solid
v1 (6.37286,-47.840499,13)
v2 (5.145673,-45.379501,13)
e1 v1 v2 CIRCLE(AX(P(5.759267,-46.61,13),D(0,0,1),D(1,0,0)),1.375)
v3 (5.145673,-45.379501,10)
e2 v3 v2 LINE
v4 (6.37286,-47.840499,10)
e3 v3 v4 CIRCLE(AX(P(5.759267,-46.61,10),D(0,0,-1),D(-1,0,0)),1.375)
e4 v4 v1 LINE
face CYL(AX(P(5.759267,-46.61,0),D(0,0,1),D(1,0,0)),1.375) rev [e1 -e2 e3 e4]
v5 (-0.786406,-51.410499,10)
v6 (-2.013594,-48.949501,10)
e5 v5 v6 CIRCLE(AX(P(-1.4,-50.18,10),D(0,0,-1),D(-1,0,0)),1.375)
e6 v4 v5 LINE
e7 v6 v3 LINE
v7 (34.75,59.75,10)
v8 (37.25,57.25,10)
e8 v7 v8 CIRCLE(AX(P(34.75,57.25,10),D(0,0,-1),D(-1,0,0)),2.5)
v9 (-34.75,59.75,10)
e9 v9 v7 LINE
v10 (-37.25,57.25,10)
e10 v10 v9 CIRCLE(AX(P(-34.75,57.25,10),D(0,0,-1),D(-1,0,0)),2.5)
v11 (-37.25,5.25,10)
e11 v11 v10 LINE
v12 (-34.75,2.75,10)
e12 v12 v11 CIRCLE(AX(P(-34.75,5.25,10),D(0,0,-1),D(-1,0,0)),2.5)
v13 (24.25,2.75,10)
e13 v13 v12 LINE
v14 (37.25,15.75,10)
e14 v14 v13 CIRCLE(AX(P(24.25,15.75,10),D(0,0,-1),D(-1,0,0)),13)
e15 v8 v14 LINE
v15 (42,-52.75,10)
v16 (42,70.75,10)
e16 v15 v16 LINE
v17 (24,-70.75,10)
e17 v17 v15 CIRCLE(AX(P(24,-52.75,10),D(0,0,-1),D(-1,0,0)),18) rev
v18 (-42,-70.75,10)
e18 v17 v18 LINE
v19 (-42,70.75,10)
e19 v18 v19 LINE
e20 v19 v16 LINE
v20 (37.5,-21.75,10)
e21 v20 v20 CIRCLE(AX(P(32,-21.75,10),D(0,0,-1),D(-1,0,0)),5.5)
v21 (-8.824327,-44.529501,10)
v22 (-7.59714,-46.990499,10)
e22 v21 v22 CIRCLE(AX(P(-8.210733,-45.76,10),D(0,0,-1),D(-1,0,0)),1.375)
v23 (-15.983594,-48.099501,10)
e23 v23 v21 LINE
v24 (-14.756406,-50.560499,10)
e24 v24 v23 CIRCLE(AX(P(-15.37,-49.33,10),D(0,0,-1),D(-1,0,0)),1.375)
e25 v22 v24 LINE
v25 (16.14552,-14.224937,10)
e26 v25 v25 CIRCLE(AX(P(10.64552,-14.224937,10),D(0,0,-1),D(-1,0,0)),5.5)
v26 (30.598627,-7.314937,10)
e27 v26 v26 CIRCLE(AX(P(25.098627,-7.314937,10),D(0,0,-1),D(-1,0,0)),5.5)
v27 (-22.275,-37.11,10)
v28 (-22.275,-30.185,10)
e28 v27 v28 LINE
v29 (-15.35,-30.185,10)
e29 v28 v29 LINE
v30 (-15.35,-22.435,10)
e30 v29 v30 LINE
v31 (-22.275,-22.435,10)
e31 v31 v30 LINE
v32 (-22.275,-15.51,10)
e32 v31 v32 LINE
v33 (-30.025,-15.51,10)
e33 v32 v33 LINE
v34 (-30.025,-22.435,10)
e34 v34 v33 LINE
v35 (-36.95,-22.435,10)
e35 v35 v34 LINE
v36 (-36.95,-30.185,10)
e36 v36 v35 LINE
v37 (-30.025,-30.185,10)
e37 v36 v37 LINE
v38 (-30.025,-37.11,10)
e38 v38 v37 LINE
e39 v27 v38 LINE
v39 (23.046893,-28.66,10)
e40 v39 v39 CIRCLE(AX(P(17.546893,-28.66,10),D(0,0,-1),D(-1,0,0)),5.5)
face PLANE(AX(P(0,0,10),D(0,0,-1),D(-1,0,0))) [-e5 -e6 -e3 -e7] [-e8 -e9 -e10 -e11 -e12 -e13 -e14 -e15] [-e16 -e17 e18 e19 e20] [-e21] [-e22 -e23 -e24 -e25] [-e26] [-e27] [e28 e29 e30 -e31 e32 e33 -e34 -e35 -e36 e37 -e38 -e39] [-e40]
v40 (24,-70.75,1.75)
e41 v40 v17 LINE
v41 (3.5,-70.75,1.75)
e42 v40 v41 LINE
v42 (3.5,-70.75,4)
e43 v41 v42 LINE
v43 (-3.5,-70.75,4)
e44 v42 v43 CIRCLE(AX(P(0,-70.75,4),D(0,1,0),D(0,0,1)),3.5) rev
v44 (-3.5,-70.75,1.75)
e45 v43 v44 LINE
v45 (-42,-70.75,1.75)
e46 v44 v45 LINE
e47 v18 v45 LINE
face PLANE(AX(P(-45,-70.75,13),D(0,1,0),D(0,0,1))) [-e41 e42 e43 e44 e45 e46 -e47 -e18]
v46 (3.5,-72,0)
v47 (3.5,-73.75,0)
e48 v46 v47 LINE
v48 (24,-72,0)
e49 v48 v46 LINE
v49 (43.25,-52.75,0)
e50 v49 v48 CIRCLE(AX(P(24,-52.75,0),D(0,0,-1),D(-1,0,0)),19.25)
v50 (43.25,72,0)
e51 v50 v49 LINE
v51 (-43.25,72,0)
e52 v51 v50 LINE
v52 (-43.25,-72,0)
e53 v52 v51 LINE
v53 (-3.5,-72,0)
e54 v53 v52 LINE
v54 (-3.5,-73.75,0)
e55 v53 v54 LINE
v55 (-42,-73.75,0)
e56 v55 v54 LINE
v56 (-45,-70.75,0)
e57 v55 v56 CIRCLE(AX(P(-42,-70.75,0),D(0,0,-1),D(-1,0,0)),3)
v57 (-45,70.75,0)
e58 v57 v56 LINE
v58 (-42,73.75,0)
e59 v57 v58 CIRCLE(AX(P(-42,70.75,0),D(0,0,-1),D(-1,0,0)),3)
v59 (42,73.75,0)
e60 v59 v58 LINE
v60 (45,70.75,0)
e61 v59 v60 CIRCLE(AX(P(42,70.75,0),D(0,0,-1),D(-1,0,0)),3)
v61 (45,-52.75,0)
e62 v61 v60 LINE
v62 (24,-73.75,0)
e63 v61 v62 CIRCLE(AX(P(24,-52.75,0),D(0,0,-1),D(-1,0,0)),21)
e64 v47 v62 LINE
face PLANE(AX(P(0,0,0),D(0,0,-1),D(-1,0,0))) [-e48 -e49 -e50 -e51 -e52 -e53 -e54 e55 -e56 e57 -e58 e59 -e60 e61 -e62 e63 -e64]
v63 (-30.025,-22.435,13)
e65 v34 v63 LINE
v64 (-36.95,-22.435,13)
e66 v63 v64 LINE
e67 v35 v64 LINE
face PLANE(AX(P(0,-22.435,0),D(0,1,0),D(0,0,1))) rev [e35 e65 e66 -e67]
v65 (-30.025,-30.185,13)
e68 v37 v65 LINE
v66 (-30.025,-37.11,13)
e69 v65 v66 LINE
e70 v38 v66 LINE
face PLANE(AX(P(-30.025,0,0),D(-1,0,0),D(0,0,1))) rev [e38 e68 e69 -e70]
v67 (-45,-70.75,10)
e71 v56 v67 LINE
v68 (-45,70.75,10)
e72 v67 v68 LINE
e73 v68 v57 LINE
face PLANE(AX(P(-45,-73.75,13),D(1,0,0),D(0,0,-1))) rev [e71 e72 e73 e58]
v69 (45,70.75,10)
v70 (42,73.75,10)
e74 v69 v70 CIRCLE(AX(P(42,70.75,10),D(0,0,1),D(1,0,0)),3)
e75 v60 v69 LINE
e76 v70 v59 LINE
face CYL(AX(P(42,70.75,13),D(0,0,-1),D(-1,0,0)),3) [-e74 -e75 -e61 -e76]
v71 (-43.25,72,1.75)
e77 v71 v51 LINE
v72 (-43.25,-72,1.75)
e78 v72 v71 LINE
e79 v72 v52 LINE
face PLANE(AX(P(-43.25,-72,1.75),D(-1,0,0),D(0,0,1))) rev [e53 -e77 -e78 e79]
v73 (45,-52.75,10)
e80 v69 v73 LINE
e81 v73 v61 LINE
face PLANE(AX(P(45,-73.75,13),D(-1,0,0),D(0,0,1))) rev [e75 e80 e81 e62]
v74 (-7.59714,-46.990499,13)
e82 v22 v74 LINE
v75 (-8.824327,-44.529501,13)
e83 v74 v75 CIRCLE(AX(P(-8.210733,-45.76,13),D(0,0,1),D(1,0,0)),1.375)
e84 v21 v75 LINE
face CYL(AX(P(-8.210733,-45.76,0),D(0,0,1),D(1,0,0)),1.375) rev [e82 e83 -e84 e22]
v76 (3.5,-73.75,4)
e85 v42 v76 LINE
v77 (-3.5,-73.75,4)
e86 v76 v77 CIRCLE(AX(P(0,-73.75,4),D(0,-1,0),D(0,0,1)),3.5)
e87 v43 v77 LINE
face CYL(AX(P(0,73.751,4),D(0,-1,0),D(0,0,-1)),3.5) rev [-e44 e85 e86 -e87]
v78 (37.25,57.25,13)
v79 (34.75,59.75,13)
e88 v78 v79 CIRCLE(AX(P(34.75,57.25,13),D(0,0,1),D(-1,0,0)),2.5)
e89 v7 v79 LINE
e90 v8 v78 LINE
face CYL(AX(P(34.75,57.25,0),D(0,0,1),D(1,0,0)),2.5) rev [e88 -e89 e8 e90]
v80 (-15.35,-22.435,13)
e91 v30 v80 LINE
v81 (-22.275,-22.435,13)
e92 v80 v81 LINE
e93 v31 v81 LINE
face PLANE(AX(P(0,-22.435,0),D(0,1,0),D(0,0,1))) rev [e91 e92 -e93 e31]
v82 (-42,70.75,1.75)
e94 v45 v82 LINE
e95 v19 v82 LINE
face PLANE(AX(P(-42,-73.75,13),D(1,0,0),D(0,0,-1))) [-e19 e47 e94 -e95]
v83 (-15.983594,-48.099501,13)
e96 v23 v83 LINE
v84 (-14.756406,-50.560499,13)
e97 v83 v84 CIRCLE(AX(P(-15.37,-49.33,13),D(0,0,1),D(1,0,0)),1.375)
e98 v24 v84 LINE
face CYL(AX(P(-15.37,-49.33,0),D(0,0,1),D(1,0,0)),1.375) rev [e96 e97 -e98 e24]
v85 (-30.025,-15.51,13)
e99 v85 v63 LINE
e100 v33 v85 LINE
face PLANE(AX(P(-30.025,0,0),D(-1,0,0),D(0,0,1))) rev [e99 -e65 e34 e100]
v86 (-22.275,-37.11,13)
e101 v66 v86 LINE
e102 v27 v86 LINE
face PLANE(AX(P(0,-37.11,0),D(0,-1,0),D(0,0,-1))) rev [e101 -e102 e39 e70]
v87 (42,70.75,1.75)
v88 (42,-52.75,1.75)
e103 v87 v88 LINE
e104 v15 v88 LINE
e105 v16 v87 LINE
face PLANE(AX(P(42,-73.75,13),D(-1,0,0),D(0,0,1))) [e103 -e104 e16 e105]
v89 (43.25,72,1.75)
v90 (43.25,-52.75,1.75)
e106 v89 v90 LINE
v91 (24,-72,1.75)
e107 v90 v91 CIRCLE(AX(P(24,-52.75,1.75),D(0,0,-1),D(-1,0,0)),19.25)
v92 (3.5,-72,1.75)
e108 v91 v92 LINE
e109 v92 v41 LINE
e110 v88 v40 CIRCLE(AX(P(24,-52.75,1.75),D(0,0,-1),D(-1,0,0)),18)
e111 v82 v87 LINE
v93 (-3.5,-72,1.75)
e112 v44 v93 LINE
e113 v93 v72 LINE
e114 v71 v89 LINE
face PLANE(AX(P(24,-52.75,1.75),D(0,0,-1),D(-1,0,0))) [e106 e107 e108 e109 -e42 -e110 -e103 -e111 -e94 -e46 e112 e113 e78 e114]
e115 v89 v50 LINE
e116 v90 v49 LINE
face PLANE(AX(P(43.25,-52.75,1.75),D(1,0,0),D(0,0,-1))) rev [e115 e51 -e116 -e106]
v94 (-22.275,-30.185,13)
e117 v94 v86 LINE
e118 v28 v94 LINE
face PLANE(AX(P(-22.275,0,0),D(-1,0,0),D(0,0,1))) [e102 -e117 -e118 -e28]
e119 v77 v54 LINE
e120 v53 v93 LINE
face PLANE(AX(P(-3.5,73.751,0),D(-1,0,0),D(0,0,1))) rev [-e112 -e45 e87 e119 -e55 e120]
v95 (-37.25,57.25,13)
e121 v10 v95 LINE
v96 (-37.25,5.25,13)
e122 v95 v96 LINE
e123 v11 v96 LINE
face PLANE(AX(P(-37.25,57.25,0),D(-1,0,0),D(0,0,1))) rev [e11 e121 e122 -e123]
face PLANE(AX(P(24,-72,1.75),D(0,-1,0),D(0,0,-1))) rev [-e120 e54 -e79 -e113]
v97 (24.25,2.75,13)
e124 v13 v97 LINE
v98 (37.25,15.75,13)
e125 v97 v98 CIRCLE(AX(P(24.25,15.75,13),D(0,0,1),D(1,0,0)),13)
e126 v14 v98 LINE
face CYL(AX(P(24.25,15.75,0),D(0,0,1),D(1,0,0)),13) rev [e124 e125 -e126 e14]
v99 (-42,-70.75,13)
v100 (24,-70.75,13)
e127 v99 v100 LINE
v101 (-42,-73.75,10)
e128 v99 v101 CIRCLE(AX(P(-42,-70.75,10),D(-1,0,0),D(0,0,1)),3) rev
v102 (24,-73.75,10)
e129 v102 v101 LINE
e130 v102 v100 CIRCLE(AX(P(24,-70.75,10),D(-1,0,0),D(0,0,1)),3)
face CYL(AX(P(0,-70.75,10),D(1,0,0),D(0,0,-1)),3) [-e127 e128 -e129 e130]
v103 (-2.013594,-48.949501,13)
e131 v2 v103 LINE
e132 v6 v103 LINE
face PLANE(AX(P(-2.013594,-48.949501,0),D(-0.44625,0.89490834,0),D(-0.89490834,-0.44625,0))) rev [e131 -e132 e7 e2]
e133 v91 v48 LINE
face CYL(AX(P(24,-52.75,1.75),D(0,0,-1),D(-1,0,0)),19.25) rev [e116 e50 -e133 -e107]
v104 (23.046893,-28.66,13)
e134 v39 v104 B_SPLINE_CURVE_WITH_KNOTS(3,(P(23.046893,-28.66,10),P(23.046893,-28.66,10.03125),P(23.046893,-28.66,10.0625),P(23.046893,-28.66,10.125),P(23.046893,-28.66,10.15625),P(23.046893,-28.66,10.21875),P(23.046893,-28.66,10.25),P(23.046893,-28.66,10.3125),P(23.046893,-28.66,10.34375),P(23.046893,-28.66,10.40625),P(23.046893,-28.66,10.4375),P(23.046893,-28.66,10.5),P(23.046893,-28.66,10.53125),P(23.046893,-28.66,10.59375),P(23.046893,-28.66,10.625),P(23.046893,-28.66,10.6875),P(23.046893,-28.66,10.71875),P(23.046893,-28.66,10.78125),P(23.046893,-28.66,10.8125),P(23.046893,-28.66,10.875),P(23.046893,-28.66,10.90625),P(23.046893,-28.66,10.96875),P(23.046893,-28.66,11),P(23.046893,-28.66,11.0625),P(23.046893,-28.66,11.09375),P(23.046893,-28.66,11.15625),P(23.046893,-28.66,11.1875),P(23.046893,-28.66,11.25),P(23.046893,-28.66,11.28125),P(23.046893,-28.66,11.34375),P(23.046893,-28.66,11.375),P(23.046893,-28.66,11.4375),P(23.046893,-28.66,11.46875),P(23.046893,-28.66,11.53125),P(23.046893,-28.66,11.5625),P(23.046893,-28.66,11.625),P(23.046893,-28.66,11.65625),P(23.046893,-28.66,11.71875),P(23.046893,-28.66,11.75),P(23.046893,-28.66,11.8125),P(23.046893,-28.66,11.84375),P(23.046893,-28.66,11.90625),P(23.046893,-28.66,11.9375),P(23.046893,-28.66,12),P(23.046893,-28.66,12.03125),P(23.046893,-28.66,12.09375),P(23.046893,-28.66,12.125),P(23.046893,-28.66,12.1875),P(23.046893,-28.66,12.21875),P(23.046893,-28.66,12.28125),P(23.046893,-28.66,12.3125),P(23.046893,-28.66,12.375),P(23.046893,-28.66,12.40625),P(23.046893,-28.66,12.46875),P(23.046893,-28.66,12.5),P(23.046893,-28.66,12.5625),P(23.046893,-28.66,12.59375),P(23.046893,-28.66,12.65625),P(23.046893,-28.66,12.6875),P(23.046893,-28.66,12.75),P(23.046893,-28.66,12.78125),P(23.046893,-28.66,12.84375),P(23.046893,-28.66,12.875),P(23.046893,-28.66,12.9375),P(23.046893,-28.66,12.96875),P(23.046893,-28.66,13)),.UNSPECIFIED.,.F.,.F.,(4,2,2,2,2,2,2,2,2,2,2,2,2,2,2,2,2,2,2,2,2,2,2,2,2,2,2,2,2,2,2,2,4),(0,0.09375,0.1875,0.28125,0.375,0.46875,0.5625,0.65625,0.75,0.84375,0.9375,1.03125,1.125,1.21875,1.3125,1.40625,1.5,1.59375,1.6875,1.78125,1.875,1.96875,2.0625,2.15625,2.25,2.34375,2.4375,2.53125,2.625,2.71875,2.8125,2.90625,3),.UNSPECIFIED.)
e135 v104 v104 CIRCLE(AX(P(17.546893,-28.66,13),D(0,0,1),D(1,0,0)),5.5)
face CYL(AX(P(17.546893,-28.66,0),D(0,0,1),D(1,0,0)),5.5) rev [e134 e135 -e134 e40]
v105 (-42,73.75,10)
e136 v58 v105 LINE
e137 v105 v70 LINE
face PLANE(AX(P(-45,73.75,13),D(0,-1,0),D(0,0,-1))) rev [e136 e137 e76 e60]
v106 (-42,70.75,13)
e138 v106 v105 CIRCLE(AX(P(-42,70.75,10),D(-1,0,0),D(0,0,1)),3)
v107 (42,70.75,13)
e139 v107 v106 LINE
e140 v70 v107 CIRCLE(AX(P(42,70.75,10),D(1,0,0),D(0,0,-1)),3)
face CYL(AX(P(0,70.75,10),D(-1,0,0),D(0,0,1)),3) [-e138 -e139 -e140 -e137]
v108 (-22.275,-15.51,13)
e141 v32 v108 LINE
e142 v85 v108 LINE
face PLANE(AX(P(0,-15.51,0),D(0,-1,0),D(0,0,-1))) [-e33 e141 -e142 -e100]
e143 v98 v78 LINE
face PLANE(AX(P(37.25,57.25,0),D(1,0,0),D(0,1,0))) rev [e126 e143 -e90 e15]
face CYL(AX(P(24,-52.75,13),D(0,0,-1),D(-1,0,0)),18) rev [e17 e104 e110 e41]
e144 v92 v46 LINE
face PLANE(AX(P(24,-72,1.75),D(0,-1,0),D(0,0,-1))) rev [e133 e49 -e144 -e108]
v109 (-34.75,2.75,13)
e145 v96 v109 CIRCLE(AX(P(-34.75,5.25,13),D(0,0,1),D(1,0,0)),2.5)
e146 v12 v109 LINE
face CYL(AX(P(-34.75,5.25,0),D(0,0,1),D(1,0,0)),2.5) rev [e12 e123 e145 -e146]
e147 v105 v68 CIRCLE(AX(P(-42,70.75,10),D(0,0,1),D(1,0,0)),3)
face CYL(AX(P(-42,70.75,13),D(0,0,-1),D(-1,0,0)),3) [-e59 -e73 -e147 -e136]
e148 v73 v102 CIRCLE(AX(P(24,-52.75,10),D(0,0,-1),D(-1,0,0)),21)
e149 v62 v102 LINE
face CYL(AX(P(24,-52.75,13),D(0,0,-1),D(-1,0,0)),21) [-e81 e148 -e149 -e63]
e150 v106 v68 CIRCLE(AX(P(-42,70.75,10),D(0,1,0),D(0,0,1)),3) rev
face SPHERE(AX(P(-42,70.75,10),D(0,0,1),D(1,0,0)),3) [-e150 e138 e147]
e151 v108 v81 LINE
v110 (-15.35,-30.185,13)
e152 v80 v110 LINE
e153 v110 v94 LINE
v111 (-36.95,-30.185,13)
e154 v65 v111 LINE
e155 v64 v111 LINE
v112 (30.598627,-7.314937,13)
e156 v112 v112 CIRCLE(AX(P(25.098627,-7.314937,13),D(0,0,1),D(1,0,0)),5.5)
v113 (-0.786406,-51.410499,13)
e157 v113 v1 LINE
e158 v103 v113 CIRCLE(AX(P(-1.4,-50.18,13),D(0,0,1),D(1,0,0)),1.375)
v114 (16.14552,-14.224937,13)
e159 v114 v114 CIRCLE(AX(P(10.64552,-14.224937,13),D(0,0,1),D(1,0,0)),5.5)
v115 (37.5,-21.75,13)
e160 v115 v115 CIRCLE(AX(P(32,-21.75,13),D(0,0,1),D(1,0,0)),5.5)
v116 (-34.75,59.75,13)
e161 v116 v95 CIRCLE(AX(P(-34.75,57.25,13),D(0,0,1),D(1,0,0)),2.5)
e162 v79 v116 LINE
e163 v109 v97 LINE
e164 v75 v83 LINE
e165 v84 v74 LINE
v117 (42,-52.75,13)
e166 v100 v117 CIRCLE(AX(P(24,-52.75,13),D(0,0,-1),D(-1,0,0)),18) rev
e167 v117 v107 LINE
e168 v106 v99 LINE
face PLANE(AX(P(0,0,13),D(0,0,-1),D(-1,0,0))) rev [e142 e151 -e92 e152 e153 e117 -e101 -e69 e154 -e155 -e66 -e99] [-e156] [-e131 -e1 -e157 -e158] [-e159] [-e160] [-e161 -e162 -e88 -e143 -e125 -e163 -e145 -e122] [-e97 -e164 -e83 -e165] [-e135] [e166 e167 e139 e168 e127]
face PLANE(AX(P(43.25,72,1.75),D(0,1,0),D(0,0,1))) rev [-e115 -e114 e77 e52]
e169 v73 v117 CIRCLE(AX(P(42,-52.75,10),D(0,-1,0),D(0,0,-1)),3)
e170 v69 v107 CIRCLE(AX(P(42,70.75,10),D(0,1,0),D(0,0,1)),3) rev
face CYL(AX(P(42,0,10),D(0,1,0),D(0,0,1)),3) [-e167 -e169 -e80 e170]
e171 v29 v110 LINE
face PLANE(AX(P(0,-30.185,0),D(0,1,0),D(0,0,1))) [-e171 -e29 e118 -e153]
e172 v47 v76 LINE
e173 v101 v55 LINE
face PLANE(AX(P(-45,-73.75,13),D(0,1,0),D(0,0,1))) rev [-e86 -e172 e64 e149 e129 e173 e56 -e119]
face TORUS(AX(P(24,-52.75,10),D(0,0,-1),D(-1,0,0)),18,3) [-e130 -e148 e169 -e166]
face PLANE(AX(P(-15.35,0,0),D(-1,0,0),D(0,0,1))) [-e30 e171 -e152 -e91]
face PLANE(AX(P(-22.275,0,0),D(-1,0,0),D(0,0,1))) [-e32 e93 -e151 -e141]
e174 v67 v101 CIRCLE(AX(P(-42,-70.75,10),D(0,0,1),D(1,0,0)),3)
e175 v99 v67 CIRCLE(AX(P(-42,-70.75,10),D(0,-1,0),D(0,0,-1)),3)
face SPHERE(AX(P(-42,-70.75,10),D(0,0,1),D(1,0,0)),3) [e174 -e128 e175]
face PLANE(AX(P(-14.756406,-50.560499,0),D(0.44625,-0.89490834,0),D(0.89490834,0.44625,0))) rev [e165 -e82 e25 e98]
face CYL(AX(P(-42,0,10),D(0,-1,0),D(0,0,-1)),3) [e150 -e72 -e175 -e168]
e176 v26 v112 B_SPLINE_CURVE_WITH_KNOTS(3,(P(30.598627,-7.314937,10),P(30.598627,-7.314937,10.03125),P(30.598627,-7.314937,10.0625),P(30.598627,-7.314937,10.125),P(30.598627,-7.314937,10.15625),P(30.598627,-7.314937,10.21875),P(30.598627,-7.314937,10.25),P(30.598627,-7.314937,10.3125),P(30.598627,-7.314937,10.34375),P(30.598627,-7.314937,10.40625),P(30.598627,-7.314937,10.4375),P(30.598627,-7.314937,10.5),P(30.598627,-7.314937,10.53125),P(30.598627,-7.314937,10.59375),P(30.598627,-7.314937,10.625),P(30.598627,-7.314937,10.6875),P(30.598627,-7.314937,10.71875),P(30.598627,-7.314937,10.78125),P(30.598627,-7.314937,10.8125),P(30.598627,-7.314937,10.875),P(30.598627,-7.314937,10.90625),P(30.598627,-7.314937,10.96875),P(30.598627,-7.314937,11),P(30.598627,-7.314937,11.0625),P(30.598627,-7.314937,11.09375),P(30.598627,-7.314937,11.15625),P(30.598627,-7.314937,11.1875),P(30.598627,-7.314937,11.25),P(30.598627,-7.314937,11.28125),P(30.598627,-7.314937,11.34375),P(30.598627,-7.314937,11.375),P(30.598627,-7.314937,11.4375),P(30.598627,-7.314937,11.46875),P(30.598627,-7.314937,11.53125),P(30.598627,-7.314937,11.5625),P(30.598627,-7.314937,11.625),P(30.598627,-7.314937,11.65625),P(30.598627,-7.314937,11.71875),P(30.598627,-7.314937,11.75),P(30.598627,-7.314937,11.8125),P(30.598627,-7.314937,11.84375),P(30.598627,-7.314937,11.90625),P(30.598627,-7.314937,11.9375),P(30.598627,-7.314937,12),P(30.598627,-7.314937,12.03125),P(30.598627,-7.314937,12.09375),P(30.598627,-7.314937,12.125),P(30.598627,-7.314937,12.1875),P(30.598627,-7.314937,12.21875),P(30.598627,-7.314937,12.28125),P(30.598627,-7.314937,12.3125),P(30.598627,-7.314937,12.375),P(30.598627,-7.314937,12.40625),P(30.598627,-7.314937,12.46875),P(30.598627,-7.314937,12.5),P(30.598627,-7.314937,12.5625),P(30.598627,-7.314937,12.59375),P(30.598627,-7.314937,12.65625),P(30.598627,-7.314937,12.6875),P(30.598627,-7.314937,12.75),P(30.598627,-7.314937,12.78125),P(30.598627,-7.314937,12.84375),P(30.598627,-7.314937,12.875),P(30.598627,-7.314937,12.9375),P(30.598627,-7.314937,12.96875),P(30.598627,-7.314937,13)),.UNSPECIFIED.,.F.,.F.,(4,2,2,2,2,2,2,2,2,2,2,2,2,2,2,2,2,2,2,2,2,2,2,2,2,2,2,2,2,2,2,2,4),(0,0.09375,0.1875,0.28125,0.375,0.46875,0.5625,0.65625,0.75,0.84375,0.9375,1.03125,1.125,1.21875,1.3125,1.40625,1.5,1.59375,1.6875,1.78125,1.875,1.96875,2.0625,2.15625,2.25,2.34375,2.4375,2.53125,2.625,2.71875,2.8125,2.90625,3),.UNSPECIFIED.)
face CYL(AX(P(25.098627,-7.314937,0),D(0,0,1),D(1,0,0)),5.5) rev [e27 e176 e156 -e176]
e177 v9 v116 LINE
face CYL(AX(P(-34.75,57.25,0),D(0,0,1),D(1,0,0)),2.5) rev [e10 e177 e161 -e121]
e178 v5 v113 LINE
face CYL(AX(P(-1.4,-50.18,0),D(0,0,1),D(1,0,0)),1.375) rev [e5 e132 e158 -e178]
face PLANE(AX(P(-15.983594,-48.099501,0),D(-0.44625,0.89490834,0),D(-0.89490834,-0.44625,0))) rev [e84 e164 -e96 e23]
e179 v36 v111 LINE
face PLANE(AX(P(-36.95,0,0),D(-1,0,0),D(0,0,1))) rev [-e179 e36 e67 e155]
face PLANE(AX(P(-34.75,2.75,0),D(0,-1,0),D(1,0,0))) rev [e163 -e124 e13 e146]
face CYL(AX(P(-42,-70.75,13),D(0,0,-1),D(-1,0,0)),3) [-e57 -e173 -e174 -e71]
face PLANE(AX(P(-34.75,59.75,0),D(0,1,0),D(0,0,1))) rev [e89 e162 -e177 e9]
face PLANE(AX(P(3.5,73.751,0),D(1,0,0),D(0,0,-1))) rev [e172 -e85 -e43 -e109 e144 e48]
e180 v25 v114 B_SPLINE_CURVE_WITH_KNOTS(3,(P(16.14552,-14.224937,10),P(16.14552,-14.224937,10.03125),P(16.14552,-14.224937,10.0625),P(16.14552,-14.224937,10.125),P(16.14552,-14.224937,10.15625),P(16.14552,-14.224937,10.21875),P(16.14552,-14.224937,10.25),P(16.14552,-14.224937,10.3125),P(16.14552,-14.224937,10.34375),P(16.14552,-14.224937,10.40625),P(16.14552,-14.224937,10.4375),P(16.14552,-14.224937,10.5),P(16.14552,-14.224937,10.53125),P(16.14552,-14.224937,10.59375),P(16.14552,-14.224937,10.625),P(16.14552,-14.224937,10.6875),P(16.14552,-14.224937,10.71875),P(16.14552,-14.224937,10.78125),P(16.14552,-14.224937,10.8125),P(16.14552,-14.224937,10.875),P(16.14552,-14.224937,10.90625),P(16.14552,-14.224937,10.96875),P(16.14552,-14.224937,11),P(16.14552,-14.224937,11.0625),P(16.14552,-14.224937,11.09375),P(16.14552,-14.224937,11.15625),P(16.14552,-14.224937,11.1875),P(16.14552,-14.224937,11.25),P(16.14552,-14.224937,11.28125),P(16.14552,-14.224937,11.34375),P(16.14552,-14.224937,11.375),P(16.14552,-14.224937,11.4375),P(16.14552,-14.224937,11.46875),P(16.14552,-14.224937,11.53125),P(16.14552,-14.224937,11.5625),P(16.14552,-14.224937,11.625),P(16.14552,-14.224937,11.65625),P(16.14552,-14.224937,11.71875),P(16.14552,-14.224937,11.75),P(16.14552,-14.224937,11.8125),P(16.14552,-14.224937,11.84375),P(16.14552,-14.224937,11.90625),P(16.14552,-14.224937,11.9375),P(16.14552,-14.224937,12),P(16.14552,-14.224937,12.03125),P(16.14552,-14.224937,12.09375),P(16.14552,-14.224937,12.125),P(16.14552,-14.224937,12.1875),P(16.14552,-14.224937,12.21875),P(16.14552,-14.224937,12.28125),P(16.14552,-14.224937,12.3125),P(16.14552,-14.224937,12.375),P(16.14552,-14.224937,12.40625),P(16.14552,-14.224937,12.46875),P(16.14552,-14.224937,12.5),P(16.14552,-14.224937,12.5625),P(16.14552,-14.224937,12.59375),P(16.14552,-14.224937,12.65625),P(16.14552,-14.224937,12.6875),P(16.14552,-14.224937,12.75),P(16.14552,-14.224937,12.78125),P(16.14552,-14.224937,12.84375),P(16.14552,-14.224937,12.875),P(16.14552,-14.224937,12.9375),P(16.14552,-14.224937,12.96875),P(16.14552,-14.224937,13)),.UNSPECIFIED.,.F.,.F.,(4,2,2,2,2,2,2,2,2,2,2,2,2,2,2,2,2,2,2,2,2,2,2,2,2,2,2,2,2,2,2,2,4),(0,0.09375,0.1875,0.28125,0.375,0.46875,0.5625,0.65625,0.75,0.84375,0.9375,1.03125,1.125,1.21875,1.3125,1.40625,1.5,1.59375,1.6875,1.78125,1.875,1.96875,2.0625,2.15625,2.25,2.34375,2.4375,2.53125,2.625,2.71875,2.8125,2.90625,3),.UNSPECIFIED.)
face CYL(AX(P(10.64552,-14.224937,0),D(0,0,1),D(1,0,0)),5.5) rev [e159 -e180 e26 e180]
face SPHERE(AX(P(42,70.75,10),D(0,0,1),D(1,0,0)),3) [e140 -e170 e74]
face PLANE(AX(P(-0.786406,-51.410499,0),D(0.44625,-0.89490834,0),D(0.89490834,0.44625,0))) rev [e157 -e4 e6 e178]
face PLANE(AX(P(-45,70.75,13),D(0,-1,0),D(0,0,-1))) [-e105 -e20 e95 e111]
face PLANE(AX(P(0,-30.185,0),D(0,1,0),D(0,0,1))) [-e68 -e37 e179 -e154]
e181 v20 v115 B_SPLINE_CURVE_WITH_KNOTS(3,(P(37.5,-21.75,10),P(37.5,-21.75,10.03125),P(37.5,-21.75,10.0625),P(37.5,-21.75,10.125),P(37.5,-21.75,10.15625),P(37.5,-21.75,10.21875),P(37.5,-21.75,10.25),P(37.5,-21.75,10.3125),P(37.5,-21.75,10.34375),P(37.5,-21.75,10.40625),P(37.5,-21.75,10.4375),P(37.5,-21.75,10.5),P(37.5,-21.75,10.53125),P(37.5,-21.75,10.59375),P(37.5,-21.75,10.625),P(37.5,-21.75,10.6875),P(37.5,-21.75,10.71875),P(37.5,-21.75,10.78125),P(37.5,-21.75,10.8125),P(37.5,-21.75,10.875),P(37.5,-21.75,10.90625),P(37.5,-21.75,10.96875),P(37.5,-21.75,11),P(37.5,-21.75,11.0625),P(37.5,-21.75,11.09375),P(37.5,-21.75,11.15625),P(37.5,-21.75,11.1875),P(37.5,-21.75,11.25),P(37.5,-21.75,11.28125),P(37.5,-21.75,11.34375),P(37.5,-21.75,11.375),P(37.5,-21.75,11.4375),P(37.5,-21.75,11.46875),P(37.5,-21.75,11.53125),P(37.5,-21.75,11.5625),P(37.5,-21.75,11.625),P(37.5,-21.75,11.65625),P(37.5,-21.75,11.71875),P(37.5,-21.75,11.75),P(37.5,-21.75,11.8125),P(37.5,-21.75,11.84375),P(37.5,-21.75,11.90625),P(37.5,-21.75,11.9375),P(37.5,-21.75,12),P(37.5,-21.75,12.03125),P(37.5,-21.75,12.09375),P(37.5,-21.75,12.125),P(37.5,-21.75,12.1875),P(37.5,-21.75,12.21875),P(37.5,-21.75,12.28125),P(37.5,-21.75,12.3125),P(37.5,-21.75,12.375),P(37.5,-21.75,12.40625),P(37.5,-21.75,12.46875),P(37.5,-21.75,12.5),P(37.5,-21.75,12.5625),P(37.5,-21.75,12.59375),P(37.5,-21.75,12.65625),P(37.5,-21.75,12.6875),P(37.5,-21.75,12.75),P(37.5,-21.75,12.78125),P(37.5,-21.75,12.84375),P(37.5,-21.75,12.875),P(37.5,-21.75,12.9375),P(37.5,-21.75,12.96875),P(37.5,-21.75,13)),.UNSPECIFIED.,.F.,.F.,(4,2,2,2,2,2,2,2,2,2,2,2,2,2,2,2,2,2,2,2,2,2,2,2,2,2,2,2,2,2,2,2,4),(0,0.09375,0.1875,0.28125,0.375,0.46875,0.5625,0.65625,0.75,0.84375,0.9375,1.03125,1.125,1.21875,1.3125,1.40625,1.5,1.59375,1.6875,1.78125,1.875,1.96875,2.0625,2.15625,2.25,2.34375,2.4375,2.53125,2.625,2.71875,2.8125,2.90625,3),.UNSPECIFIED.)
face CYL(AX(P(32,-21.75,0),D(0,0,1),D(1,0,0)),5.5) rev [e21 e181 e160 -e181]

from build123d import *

# Parameters (mm, degrees)
SKETCH1_W               = 90
SKETCH1_H               = 147.5
BOSS_EXTRUDE1_DEPTH     = 13
ROUNDED_BOTTOM_CORNER_R = 21
ROUND_EDGES_R           = 3
SHELL2_DEPTH            = 10
CUT_EXTRUDE1_DEPTH      = 88.367399526
CUT_EXTRUDE2_DEPTH      = 1.75
CUT_EXTRUDE3_REACH      = 156.759
SKETCH6_R               = 5.5
CUT_EXTRUDE4_DEPTH      = 88.367399526
SKETCH7_W               = 7.75
SKETCH7_H               = 21.6
SKETCH7_W_2             = 21.6
SKETCH7_H_2             = 7.75
CUT_EXTRUDE5_DEPTH      = 88.367399526
CUT_EXTRUDE6_DEPTH      = 88.367399526


# Read off the part's stored shape, not the designer's step: Shell2
with BuildPart() as part:
    # Sketch1 → Boss-Extrude1 (new body)
    with BuildSketch(Plane.XY):
        Rectangle(SKETCH1_W, SKETCH1_H)
    extrude(amount=BOSS_EXTRUDE1_DEPTH)

    # Rounded Bottom Corner
    rounded_bottom_corner_edges = [part.edges().sort_by_distance(p)[0] for p in [
        (45, -73.75, 6.5),
    ]]
    fillet(rounded_bottom_corner_edges, radius=ROUNDED_BOTTOM_CORNER_R)

    # Round Edges
    round_edges_edges = [part.edges().sort_by_distance(p)[0] for p in [
        (-45, 0, 13),
        (-10.5, -73.75, 13),
        (45, 10.5, 13),
        (38.849242405, -67.599242405, 13),
        (0, 73.75, 13),
        (-45, -73.75, 6.5),
        (-45, 73.75, 6.5),
        (45, 73.75, 6.5),
    ]]
    fillet(round_edges_edges, radius=ROUND_EDGES_R)

    # Shell2 outline → Shell2 (cut)
    with BuildSketch(Plane.XY):
        with BuildLine():
            Line((42, -52.75), (42, 70.75))
            Line((42, 70.75), (-42, 70.75))
            Line((-42, 70.75), (-42, -70.75))
            Line((-42, -70.75), (24, -70.75))
            ThreePointArc((24, -70.75), (36.727922061, -65.477922061), (42, -52.75))
        make_face()
    extrude(amount=SHELL2_DEPTH, mode=Mode.SUBTRACT)

    # Sketch2 → Cut-Extrude1 (cut, through all)
    with BuildSketch(Plane.XY.offset(13)):
        with BuildLine():
            Line((-34.75, 59.75), (34.75, 59.75))
            ThreePointArc((34.75, 59.75), (36.517766953, 59.017766953), (37.25, 57.25))
            Line((37.25, 57.25), (37.25, 15.75))
            ThreePointArc((37.25, 15.75), (33.442388155, 6.557611845), (24.25, 2.75))
            Line((24.25, 2.75), (-34.75, 2.75))
            ThreePointArc((-34.75, 2.75), (-36.517766953, 3.482233047), (-37.25, 5.25))
            Line((-37.25, 5.25), (-37.25, 57.25))
            ThreePointArc((-37.25, 57.25), (-36.517766953, 59.017766953), (-34.75, 59.75))
        make_face()
    extrude(amount=-CUT_EXTRUDE1_DEPTH, mode=Mode.SUBTRACT)

    # Sketch3 → Cut-Extrude2 (cut)
    with BuildSketch(Plane(origin=(0, 0, 0), x_dir=(-1, 0, 0), z_dir=(0, 0, -1))):
        with BuildLine():
            Line((-43.25, -52.75), (-43.25, 72))
            Line((-43.25, 72), (43.25, 72))
            Line((43.25, 72), (43.25, -72))
            Line((43.25, -72), (-24, -72))
            ThreePointArc((-24, -72), (-37.611805538, -66.361805538), (-43.25, -52.75))
        make_face()
        with BuildLine():
            Line((-42, -52.75), (-42, 70.75))
            Line((-42, 70.75), (42, 70.75))
            Line((42, 70.75), (42, -70.75))
            Line((42, -70.75), (-24, -70.75))
            ThreePointArc((-24, -70.75), (-36.727922061, -65.477922061), (-42, -52.75))
        make_face(mode=Mode.SUBTRACT)
    extrude(amount=-CUT_EXTRUDE2_DEPTH, mode=Mode.SUBTRACT)

    # Sketch4 → Cut-Extrude3 (cut, up to next)
    with BuildSketch(Plane.XZ.offset(73.75), mode=Mode.PRIVATE) as cut_extrude3_sk1:
        with BuildLine():
            Line((-3.5, 0), (3.5, 0))
            Line((3.5, 0), (3.5, 4))
            ThreePointArc((3.5, 4), (0, 7.5), (-3.5, 4))
            Line((-3.5, 4), (-3.5, 0))
        make_face()
    cut_extrude3_tool1 = extrude(cut_extrude3_sk1.sketch, amount=-CUT_EXTRUDE3_REACH, mode=Mode.PRIVATE) & part.part
    add(cut_extrude3_tool1.solids().sort_by_distance((0, -73.75, 3.419658))[0], mode=Mode.SUBTRACT)

    # Sketch6 → Cut-Extrude4 (cut, through all)
    with BuildSketch(Plane.XY.offset(13)):
        with Locations((32, -21.75)):
            Circle(SKETCH6_R)
        with Locations((17.546893068, -28.66)):
            Circle(SKETCH6_R)
        with Locations((25.098626717, -7.314936896)):
            Circle(SKETCH6_R)
        with Locations((10.645519784, -14.224936896)):
            Circle(SKETCH6_R)
    extrude(amount=-CUT_EXTRUDE4_DEPTH, mode=Mode.SUBTRACT)

    # Sketch7 → Cut-Extrude5 (cut, through all)
    with BuildSketch(Plane.XY.offset(13)):
        with Locations((-26.15, -26.31)):
            Rectangle(SKETCH7_W, SKETCH7_H)
        with Locations((-26.15, -26.31)):
            Rectangle(SKETCH7_W_2, SKETCH7_H_2)
    extrude(amount=-CUT_EXTRUDE5_DEPTH, mode=Mode.SUBTRACT)

    # Sketch8 → Cut-Extrude6 (cut, through all)
    with BuildSketch(Plane.XY.offset(13)):
        with BuildLine():
            Line((-2.01359375, -48.949501032), (5.145672972, -45.379501032))
            ThreePointArc((5.145672972, -45.379501032), (6.98976569, -45.99640625), (6.372860472, -47.840498968))
            Line((6.372860472, -47.840498968), (-0.78640625, -51.410498968))
            ThreePointArc((-0.78640625, -51.410498968), (-2.630498968, -50.79359375), (-2.01359375, -48.949501032))
        make_face()
        with BuildLine():
            Line((-15.98359375, -48.099501032), (-8.824327028, -44.529501032))
            ThreePointArc((-8.824327028, -44.529501032), (-6.98023431, -45.14640625), (-7.597139528, -46.990498968))
            Line((-7.597139528, -46.990498968), (-14.75640625, -50.560498968))
            ThreePointArc((-14.75640625, -50.560498968), (-16.600498968, -49.94359375), (-15.98359375, -48.099501032))
        make_face()
    extrude(amount=-CUT_EXTRUDE6_DEPTH, mode=Mode.SUBTRACT)


solid = part.part
